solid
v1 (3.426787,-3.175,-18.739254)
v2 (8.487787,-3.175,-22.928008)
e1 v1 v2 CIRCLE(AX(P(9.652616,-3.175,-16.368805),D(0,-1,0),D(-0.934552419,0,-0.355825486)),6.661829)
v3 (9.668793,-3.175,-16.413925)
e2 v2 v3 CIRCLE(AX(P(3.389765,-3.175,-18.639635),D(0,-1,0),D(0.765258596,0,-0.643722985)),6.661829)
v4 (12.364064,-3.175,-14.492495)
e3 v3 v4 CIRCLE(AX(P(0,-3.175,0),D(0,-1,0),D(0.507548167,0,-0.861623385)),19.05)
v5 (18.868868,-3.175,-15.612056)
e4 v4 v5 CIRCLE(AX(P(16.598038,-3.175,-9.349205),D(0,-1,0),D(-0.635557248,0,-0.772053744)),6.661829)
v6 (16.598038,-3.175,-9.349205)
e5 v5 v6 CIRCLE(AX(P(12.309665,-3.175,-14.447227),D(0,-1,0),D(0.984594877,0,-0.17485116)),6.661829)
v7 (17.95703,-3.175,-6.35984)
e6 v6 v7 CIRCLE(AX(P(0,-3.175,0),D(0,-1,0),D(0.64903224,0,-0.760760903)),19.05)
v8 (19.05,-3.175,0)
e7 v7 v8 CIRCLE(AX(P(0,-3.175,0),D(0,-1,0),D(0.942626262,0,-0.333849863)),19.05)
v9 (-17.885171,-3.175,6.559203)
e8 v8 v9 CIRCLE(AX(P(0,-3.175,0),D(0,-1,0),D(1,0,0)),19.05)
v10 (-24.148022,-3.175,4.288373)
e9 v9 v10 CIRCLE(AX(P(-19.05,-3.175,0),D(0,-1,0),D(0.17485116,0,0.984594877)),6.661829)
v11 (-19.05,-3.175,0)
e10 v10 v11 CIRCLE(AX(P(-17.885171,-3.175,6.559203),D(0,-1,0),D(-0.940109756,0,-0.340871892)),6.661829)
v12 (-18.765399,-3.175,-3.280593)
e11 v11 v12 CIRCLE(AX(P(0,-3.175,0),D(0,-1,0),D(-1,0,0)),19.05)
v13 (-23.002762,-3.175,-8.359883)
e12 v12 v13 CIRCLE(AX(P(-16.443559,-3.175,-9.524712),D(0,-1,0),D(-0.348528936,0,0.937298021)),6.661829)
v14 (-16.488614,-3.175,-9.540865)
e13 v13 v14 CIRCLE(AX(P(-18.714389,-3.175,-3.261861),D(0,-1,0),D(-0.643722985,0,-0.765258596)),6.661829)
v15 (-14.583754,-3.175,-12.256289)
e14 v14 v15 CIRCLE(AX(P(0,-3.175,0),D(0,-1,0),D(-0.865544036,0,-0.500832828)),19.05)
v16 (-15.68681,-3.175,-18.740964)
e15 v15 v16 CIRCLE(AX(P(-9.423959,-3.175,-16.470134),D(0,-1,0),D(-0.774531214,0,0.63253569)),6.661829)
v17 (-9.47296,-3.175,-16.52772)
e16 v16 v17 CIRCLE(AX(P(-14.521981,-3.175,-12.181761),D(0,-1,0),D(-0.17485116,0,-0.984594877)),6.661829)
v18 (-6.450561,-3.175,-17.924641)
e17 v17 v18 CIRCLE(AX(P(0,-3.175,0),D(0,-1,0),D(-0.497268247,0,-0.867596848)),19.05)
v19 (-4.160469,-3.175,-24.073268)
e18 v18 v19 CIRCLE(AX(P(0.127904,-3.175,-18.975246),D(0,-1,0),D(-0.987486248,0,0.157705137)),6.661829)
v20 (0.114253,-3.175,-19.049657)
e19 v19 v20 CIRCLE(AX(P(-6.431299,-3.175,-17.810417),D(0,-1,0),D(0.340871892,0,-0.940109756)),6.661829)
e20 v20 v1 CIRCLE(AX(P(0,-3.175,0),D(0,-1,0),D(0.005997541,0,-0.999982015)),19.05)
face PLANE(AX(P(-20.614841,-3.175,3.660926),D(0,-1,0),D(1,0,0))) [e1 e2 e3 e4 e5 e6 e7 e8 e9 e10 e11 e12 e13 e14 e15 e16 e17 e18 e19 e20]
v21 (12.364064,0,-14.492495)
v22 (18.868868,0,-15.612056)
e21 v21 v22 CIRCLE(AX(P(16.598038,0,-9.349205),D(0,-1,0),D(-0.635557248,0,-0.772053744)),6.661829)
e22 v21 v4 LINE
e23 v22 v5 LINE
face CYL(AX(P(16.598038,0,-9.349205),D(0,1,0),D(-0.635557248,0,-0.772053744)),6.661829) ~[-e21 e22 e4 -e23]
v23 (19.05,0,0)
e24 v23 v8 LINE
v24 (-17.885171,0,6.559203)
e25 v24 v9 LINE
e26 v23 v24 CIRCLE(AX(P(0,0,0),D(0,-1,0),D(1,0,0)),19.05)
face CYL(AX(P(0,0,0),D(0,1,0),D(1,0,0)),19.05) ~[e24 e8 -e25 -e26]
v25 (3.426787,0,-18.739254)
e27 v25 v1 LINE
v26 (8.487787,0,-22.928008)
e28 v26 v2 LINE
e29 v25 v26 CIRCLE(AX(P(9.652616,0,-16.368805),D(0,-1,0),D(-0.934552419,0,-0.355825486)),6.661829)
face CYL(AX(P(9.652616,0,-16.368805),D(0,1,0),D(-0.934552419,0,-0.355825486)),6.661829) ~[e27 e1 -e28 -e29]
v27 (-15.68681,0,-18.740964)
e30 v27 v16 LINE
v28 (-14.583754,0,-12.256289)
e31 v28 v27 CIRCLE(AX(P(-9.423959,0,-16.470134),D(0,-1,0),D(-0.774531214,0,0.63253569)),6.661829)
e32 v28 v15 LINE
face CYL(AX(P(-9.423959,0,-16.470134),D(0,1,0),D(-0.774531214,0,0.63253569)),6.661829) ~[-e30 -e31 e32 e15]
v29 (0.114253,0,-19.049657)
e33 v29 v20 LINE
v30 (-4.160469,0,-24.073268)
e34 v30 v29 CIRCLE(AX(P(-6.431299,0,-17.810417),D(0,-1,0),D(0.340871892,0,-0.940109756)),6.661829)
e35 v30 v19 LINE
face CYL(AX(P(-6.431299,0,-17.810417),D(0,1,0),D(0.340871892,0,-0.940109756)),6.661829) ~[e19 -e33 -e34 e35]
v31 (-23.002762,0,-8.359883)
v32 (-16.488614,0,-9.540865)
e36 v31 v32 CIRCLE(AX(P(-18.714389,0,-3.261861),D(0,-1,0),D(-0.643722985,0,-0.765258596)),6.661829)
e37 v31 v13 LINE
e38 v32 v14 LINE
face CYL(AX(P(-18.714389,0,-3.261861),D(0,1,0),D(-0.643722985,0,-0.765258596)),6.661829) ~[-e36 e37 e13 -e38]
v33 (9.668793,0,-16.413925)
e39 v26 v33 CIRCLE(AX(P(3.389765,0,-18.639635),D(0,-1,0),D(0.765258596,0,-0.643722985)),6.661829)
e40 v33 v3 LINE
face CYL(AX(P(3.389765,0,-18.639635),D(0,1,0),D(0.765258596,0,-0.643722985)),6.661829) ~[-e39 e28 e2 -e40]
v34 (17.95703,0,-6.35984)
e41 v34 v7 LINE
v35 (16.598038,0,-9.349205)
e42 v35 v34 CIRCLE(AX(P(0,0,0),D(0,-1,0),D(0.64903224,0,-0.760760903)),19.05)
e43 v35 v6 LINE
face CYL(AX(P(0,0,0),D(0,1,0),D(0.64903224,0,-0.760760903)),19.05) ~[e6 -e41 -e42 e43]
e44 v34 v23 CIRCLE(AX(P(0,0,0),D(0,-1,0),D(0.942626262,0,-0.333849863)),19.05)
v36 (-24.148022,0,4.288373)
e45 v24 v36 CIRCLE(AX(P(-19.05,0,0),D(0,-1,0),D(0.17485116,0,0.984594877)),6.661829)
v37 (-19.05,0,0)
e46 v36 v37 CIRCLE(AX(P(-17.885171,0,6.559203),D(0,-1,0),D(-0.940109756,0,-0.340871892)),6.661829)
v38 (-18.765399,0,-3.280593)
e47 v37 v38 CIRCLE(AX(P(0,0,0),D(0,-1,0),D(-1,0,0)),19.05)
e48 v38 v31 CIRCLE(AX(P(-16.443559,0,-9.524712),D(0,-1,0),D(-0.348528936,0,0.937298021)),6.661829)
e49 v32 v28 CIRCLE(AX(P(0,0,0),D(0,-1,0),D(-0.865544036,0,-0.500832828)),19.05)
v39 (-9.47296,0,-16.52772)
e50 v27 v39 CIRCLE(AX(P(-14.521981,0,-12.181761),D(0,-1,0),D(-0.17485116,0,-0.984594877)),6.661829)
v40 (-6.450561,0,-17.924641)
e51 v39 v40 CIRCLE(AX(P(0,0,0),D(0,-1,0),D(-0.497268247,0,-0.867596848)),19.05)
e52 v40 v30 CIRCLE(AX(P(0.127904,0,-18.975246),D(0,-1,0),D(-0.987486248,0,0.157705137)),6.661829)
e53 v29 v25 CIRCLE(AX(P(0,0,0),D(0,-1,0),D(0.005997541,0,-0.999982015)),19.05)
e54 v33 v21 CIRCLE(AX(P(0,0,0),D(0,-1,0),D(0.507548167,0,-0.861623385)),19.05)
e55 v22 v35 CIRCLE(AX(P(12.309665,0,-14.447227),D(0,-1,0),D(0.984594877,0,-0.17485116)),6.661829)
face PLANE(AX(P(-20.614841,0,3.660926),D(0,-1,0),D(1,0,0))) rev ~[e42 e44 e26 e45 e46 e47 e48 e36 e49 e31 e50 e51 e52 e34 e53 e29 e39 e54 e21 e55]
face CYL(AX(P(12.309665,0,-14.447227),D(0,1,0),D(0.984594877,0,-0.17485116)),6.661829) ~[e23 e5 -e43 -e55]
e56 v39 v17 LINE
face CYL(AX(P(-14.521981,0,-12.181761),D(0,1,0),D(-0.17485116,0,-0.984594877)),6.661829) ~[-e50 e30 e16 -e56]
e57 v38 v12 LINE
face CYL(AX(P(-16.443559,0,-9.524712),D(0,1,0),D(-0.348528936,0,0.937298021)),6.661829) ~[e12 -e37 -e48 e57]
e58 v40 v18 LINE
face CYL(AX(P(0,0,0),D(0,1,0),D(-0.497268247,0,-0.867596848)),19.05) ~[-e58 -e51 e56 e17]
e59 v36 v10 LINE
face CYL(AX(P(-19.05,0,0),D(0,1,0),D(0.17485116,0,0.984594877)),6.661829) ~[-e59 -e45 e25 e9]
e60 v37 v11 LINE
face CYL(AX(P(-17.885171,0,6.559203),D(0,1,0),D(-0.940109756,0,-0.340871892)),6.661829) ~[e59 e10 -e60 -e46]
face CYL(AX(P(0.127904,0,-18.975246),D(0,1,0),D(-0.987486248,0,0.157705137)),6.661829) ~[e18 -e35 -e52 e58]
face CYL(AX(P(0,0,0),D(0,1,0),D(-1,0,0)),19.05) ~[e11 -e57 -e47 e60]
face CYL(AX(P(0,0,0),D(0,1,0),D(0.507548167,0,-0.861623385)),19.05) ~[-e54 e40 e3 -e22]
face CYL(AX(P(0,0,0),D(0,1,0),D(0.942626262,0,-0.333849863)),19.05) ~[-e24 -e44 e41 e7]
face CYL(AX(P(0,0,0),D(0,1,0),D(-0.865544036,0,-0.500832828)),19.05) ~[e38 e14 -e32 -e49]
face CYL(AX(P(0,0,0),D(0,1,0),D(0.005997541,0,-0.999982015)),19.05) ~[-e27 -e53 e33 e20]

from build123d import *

# Parameters (mm, degrees)
F1_DEPTH = 3.175


# Not quite as in the source:
# - a feature names something its author has since deleted; it is built from what else it names


with BuildPart() as f1:
    # F0 (on Front) → F1 (new body)
    with BuildSketch(Plane.XZ):
        with BuildLine():
            ThreePointArc((-19.05, 0), (-18.7565324084, 3.330914591), (-17.8851714423, 6.5592028846))
            ThreePointArc((-17.8851714423, 6.5592028846), (-21.3208303202, 6.2628506055), (-24.1480220477, 4.2883725643))
            ThreePointArc((-24.1480220477, 4.2883725643), (-22.1735440066, 1.4611808368), (-19.05, 0))
        make_face()
        with BuildLine():
            ThreePointArc((17.9570302857, -6.3598398815), (18.774769332, -3.2265363052), (19.05, 0))
            ThreePointArc((19.05, 0), (3.330914591, 18.7565324084), (-17.8851714423, 6.5592028846))
            ThreePointArc((-17.8851714423, 6.5592028846), (-18.7565324084, 3.330914591), (-19.05, 0))
            ThreePointArc((-19.05, 0), (-18.9787164623, -1.6464572402), (-18.7653993235, -3.2805926645))
            ThreePointArc((-18.7653993235, -3.2805926645), (-17.902768373, -6.5110202414), (-16.4886138833, -9.5408653804))
            ThreePointArc((-16.4886138833, -9.5408653804), (-15.5953963885, -10.940114784), (-14.5837536932, -12.2562893331))
            ThreePointArc((-14.5837536932, -12.2562893331), (-12.2164908848, -14.6171081429), (-9.4729601013, -16.5277199552))
            ThreePointArc((-9.4729601013, -16.5277199552), (-7.9923386115, -17.2923400244), (-6.4505607615, -17.9246413036))
            ThreePointArc((-6.4505607615, -17.9246413036), (-3.2177031841, -18.7762852082), (0.114253165, -19.0496573779))
            ThreePointArc((0.114253165, -19.0496573779), (1.7773096461, -18.9669098807), (3.4267873399, -18.7392536812))
            ThreePointArc((3.4267873399, -18.7392536812), (6.6502136181, -17.8515309941), (9.6687925813, -16.4139254909))
            ThreePointArc((9.6687925813, -16.4139254909), (11.058239811, -15.5118610193), (12.3640641678, -14.4924952045))
            ThreePointArc((12.3640641678, -14.4924952045), (14.707623832, -12.107365577), (16.5980379903, -9.3492050396))
            ThreePointArc((16.5980379903, -9.3492050396), (17.3420662524, -7.8838593403), (17.9570302857, -6.3598398815))
        make_face()
        with BuildLine():
            ThreePointArc((-16.4886138833, -9.5408653804), (-17.902768373, -6.5110202414), (-18.7653993235, -3.2805926645))
            ThreePointArc((-18.7653993235, -3.2805926645), (-21.5590287963, -5.2571672852), (-23.0027619685, -8.3598834163))
            ThreePointArc((-23.0027619685, -8.3598834163), (-19.9027732819, -9.816837479), (-16.4886138833, -9.5408653804))
        make_face()
        with BuildLine():
            ThreePointArc((-9.4729601013, -16.5277199552), (-12.2164908848, -14.6171081429), (-14.5837536932, -12.2562893331))
            ThreePointArc((-14.5837536932, -12.2562893331), (-15.9914516234, -15.352990661), (-15.6868096556, -18.7409643694))
            ThreePointArc((-15.6868096556, -18.7409643694), (-12.286729337, -18.4573983143), (-9.4729601013, -16.5277199552))
        make_face()
        with BuildLine():
            ThreePointArc((-4.1604686233, -24.0732680372), (-1.3577089131, -22.1276679749), (0.114253165, -19.0496573779))
            ThreePointArc((0.114253165, -19.0496573779), (-3.2177031841, -18.7762852082), (-6.4505607615, -17.9246413036))
            ThreePointArc((-6.4505607615, -17.9246413036), (-6.1149672512, -21.3004400299), (-4.1604686233, -24.0732680372))
        make_face()
        with BuildLine():
            ThreePointArc((8.4877873574, -22.928007958), (9.9447352105, -19.8280535223), (9.6687925813, -16.4139254909))
            ThreePointArc((9.6687925813, -16.4139254909), (6.6502136181, -17.8515309941), (3.4267873399, -18.7392536812))
            ThreePointArc((3.4267873399, -18.7392536812), (5.4050438072, -21.50087086), (8.4877873574, -22.928007958))
        make_face()
        with BuildLine():
            ThreePointArc((18.8688683105, -15.6120556451), (18.5725160314, -12.1763967671), (16.5980379903, -9.3492050396))
            ThreePointArc((16.5980379903, -9.3492050396), (14.707623832, -12.107365577), (12.3640641678, -14.4924952045))
            ThreePointArc((12.3640641678, -14.4924952045), (15.4680658678, -15.9145025235), (18.8688683105, -15.6120556451))
        make_face()
    extrude(amount=F1_DEPTH)


solid = f1.part
